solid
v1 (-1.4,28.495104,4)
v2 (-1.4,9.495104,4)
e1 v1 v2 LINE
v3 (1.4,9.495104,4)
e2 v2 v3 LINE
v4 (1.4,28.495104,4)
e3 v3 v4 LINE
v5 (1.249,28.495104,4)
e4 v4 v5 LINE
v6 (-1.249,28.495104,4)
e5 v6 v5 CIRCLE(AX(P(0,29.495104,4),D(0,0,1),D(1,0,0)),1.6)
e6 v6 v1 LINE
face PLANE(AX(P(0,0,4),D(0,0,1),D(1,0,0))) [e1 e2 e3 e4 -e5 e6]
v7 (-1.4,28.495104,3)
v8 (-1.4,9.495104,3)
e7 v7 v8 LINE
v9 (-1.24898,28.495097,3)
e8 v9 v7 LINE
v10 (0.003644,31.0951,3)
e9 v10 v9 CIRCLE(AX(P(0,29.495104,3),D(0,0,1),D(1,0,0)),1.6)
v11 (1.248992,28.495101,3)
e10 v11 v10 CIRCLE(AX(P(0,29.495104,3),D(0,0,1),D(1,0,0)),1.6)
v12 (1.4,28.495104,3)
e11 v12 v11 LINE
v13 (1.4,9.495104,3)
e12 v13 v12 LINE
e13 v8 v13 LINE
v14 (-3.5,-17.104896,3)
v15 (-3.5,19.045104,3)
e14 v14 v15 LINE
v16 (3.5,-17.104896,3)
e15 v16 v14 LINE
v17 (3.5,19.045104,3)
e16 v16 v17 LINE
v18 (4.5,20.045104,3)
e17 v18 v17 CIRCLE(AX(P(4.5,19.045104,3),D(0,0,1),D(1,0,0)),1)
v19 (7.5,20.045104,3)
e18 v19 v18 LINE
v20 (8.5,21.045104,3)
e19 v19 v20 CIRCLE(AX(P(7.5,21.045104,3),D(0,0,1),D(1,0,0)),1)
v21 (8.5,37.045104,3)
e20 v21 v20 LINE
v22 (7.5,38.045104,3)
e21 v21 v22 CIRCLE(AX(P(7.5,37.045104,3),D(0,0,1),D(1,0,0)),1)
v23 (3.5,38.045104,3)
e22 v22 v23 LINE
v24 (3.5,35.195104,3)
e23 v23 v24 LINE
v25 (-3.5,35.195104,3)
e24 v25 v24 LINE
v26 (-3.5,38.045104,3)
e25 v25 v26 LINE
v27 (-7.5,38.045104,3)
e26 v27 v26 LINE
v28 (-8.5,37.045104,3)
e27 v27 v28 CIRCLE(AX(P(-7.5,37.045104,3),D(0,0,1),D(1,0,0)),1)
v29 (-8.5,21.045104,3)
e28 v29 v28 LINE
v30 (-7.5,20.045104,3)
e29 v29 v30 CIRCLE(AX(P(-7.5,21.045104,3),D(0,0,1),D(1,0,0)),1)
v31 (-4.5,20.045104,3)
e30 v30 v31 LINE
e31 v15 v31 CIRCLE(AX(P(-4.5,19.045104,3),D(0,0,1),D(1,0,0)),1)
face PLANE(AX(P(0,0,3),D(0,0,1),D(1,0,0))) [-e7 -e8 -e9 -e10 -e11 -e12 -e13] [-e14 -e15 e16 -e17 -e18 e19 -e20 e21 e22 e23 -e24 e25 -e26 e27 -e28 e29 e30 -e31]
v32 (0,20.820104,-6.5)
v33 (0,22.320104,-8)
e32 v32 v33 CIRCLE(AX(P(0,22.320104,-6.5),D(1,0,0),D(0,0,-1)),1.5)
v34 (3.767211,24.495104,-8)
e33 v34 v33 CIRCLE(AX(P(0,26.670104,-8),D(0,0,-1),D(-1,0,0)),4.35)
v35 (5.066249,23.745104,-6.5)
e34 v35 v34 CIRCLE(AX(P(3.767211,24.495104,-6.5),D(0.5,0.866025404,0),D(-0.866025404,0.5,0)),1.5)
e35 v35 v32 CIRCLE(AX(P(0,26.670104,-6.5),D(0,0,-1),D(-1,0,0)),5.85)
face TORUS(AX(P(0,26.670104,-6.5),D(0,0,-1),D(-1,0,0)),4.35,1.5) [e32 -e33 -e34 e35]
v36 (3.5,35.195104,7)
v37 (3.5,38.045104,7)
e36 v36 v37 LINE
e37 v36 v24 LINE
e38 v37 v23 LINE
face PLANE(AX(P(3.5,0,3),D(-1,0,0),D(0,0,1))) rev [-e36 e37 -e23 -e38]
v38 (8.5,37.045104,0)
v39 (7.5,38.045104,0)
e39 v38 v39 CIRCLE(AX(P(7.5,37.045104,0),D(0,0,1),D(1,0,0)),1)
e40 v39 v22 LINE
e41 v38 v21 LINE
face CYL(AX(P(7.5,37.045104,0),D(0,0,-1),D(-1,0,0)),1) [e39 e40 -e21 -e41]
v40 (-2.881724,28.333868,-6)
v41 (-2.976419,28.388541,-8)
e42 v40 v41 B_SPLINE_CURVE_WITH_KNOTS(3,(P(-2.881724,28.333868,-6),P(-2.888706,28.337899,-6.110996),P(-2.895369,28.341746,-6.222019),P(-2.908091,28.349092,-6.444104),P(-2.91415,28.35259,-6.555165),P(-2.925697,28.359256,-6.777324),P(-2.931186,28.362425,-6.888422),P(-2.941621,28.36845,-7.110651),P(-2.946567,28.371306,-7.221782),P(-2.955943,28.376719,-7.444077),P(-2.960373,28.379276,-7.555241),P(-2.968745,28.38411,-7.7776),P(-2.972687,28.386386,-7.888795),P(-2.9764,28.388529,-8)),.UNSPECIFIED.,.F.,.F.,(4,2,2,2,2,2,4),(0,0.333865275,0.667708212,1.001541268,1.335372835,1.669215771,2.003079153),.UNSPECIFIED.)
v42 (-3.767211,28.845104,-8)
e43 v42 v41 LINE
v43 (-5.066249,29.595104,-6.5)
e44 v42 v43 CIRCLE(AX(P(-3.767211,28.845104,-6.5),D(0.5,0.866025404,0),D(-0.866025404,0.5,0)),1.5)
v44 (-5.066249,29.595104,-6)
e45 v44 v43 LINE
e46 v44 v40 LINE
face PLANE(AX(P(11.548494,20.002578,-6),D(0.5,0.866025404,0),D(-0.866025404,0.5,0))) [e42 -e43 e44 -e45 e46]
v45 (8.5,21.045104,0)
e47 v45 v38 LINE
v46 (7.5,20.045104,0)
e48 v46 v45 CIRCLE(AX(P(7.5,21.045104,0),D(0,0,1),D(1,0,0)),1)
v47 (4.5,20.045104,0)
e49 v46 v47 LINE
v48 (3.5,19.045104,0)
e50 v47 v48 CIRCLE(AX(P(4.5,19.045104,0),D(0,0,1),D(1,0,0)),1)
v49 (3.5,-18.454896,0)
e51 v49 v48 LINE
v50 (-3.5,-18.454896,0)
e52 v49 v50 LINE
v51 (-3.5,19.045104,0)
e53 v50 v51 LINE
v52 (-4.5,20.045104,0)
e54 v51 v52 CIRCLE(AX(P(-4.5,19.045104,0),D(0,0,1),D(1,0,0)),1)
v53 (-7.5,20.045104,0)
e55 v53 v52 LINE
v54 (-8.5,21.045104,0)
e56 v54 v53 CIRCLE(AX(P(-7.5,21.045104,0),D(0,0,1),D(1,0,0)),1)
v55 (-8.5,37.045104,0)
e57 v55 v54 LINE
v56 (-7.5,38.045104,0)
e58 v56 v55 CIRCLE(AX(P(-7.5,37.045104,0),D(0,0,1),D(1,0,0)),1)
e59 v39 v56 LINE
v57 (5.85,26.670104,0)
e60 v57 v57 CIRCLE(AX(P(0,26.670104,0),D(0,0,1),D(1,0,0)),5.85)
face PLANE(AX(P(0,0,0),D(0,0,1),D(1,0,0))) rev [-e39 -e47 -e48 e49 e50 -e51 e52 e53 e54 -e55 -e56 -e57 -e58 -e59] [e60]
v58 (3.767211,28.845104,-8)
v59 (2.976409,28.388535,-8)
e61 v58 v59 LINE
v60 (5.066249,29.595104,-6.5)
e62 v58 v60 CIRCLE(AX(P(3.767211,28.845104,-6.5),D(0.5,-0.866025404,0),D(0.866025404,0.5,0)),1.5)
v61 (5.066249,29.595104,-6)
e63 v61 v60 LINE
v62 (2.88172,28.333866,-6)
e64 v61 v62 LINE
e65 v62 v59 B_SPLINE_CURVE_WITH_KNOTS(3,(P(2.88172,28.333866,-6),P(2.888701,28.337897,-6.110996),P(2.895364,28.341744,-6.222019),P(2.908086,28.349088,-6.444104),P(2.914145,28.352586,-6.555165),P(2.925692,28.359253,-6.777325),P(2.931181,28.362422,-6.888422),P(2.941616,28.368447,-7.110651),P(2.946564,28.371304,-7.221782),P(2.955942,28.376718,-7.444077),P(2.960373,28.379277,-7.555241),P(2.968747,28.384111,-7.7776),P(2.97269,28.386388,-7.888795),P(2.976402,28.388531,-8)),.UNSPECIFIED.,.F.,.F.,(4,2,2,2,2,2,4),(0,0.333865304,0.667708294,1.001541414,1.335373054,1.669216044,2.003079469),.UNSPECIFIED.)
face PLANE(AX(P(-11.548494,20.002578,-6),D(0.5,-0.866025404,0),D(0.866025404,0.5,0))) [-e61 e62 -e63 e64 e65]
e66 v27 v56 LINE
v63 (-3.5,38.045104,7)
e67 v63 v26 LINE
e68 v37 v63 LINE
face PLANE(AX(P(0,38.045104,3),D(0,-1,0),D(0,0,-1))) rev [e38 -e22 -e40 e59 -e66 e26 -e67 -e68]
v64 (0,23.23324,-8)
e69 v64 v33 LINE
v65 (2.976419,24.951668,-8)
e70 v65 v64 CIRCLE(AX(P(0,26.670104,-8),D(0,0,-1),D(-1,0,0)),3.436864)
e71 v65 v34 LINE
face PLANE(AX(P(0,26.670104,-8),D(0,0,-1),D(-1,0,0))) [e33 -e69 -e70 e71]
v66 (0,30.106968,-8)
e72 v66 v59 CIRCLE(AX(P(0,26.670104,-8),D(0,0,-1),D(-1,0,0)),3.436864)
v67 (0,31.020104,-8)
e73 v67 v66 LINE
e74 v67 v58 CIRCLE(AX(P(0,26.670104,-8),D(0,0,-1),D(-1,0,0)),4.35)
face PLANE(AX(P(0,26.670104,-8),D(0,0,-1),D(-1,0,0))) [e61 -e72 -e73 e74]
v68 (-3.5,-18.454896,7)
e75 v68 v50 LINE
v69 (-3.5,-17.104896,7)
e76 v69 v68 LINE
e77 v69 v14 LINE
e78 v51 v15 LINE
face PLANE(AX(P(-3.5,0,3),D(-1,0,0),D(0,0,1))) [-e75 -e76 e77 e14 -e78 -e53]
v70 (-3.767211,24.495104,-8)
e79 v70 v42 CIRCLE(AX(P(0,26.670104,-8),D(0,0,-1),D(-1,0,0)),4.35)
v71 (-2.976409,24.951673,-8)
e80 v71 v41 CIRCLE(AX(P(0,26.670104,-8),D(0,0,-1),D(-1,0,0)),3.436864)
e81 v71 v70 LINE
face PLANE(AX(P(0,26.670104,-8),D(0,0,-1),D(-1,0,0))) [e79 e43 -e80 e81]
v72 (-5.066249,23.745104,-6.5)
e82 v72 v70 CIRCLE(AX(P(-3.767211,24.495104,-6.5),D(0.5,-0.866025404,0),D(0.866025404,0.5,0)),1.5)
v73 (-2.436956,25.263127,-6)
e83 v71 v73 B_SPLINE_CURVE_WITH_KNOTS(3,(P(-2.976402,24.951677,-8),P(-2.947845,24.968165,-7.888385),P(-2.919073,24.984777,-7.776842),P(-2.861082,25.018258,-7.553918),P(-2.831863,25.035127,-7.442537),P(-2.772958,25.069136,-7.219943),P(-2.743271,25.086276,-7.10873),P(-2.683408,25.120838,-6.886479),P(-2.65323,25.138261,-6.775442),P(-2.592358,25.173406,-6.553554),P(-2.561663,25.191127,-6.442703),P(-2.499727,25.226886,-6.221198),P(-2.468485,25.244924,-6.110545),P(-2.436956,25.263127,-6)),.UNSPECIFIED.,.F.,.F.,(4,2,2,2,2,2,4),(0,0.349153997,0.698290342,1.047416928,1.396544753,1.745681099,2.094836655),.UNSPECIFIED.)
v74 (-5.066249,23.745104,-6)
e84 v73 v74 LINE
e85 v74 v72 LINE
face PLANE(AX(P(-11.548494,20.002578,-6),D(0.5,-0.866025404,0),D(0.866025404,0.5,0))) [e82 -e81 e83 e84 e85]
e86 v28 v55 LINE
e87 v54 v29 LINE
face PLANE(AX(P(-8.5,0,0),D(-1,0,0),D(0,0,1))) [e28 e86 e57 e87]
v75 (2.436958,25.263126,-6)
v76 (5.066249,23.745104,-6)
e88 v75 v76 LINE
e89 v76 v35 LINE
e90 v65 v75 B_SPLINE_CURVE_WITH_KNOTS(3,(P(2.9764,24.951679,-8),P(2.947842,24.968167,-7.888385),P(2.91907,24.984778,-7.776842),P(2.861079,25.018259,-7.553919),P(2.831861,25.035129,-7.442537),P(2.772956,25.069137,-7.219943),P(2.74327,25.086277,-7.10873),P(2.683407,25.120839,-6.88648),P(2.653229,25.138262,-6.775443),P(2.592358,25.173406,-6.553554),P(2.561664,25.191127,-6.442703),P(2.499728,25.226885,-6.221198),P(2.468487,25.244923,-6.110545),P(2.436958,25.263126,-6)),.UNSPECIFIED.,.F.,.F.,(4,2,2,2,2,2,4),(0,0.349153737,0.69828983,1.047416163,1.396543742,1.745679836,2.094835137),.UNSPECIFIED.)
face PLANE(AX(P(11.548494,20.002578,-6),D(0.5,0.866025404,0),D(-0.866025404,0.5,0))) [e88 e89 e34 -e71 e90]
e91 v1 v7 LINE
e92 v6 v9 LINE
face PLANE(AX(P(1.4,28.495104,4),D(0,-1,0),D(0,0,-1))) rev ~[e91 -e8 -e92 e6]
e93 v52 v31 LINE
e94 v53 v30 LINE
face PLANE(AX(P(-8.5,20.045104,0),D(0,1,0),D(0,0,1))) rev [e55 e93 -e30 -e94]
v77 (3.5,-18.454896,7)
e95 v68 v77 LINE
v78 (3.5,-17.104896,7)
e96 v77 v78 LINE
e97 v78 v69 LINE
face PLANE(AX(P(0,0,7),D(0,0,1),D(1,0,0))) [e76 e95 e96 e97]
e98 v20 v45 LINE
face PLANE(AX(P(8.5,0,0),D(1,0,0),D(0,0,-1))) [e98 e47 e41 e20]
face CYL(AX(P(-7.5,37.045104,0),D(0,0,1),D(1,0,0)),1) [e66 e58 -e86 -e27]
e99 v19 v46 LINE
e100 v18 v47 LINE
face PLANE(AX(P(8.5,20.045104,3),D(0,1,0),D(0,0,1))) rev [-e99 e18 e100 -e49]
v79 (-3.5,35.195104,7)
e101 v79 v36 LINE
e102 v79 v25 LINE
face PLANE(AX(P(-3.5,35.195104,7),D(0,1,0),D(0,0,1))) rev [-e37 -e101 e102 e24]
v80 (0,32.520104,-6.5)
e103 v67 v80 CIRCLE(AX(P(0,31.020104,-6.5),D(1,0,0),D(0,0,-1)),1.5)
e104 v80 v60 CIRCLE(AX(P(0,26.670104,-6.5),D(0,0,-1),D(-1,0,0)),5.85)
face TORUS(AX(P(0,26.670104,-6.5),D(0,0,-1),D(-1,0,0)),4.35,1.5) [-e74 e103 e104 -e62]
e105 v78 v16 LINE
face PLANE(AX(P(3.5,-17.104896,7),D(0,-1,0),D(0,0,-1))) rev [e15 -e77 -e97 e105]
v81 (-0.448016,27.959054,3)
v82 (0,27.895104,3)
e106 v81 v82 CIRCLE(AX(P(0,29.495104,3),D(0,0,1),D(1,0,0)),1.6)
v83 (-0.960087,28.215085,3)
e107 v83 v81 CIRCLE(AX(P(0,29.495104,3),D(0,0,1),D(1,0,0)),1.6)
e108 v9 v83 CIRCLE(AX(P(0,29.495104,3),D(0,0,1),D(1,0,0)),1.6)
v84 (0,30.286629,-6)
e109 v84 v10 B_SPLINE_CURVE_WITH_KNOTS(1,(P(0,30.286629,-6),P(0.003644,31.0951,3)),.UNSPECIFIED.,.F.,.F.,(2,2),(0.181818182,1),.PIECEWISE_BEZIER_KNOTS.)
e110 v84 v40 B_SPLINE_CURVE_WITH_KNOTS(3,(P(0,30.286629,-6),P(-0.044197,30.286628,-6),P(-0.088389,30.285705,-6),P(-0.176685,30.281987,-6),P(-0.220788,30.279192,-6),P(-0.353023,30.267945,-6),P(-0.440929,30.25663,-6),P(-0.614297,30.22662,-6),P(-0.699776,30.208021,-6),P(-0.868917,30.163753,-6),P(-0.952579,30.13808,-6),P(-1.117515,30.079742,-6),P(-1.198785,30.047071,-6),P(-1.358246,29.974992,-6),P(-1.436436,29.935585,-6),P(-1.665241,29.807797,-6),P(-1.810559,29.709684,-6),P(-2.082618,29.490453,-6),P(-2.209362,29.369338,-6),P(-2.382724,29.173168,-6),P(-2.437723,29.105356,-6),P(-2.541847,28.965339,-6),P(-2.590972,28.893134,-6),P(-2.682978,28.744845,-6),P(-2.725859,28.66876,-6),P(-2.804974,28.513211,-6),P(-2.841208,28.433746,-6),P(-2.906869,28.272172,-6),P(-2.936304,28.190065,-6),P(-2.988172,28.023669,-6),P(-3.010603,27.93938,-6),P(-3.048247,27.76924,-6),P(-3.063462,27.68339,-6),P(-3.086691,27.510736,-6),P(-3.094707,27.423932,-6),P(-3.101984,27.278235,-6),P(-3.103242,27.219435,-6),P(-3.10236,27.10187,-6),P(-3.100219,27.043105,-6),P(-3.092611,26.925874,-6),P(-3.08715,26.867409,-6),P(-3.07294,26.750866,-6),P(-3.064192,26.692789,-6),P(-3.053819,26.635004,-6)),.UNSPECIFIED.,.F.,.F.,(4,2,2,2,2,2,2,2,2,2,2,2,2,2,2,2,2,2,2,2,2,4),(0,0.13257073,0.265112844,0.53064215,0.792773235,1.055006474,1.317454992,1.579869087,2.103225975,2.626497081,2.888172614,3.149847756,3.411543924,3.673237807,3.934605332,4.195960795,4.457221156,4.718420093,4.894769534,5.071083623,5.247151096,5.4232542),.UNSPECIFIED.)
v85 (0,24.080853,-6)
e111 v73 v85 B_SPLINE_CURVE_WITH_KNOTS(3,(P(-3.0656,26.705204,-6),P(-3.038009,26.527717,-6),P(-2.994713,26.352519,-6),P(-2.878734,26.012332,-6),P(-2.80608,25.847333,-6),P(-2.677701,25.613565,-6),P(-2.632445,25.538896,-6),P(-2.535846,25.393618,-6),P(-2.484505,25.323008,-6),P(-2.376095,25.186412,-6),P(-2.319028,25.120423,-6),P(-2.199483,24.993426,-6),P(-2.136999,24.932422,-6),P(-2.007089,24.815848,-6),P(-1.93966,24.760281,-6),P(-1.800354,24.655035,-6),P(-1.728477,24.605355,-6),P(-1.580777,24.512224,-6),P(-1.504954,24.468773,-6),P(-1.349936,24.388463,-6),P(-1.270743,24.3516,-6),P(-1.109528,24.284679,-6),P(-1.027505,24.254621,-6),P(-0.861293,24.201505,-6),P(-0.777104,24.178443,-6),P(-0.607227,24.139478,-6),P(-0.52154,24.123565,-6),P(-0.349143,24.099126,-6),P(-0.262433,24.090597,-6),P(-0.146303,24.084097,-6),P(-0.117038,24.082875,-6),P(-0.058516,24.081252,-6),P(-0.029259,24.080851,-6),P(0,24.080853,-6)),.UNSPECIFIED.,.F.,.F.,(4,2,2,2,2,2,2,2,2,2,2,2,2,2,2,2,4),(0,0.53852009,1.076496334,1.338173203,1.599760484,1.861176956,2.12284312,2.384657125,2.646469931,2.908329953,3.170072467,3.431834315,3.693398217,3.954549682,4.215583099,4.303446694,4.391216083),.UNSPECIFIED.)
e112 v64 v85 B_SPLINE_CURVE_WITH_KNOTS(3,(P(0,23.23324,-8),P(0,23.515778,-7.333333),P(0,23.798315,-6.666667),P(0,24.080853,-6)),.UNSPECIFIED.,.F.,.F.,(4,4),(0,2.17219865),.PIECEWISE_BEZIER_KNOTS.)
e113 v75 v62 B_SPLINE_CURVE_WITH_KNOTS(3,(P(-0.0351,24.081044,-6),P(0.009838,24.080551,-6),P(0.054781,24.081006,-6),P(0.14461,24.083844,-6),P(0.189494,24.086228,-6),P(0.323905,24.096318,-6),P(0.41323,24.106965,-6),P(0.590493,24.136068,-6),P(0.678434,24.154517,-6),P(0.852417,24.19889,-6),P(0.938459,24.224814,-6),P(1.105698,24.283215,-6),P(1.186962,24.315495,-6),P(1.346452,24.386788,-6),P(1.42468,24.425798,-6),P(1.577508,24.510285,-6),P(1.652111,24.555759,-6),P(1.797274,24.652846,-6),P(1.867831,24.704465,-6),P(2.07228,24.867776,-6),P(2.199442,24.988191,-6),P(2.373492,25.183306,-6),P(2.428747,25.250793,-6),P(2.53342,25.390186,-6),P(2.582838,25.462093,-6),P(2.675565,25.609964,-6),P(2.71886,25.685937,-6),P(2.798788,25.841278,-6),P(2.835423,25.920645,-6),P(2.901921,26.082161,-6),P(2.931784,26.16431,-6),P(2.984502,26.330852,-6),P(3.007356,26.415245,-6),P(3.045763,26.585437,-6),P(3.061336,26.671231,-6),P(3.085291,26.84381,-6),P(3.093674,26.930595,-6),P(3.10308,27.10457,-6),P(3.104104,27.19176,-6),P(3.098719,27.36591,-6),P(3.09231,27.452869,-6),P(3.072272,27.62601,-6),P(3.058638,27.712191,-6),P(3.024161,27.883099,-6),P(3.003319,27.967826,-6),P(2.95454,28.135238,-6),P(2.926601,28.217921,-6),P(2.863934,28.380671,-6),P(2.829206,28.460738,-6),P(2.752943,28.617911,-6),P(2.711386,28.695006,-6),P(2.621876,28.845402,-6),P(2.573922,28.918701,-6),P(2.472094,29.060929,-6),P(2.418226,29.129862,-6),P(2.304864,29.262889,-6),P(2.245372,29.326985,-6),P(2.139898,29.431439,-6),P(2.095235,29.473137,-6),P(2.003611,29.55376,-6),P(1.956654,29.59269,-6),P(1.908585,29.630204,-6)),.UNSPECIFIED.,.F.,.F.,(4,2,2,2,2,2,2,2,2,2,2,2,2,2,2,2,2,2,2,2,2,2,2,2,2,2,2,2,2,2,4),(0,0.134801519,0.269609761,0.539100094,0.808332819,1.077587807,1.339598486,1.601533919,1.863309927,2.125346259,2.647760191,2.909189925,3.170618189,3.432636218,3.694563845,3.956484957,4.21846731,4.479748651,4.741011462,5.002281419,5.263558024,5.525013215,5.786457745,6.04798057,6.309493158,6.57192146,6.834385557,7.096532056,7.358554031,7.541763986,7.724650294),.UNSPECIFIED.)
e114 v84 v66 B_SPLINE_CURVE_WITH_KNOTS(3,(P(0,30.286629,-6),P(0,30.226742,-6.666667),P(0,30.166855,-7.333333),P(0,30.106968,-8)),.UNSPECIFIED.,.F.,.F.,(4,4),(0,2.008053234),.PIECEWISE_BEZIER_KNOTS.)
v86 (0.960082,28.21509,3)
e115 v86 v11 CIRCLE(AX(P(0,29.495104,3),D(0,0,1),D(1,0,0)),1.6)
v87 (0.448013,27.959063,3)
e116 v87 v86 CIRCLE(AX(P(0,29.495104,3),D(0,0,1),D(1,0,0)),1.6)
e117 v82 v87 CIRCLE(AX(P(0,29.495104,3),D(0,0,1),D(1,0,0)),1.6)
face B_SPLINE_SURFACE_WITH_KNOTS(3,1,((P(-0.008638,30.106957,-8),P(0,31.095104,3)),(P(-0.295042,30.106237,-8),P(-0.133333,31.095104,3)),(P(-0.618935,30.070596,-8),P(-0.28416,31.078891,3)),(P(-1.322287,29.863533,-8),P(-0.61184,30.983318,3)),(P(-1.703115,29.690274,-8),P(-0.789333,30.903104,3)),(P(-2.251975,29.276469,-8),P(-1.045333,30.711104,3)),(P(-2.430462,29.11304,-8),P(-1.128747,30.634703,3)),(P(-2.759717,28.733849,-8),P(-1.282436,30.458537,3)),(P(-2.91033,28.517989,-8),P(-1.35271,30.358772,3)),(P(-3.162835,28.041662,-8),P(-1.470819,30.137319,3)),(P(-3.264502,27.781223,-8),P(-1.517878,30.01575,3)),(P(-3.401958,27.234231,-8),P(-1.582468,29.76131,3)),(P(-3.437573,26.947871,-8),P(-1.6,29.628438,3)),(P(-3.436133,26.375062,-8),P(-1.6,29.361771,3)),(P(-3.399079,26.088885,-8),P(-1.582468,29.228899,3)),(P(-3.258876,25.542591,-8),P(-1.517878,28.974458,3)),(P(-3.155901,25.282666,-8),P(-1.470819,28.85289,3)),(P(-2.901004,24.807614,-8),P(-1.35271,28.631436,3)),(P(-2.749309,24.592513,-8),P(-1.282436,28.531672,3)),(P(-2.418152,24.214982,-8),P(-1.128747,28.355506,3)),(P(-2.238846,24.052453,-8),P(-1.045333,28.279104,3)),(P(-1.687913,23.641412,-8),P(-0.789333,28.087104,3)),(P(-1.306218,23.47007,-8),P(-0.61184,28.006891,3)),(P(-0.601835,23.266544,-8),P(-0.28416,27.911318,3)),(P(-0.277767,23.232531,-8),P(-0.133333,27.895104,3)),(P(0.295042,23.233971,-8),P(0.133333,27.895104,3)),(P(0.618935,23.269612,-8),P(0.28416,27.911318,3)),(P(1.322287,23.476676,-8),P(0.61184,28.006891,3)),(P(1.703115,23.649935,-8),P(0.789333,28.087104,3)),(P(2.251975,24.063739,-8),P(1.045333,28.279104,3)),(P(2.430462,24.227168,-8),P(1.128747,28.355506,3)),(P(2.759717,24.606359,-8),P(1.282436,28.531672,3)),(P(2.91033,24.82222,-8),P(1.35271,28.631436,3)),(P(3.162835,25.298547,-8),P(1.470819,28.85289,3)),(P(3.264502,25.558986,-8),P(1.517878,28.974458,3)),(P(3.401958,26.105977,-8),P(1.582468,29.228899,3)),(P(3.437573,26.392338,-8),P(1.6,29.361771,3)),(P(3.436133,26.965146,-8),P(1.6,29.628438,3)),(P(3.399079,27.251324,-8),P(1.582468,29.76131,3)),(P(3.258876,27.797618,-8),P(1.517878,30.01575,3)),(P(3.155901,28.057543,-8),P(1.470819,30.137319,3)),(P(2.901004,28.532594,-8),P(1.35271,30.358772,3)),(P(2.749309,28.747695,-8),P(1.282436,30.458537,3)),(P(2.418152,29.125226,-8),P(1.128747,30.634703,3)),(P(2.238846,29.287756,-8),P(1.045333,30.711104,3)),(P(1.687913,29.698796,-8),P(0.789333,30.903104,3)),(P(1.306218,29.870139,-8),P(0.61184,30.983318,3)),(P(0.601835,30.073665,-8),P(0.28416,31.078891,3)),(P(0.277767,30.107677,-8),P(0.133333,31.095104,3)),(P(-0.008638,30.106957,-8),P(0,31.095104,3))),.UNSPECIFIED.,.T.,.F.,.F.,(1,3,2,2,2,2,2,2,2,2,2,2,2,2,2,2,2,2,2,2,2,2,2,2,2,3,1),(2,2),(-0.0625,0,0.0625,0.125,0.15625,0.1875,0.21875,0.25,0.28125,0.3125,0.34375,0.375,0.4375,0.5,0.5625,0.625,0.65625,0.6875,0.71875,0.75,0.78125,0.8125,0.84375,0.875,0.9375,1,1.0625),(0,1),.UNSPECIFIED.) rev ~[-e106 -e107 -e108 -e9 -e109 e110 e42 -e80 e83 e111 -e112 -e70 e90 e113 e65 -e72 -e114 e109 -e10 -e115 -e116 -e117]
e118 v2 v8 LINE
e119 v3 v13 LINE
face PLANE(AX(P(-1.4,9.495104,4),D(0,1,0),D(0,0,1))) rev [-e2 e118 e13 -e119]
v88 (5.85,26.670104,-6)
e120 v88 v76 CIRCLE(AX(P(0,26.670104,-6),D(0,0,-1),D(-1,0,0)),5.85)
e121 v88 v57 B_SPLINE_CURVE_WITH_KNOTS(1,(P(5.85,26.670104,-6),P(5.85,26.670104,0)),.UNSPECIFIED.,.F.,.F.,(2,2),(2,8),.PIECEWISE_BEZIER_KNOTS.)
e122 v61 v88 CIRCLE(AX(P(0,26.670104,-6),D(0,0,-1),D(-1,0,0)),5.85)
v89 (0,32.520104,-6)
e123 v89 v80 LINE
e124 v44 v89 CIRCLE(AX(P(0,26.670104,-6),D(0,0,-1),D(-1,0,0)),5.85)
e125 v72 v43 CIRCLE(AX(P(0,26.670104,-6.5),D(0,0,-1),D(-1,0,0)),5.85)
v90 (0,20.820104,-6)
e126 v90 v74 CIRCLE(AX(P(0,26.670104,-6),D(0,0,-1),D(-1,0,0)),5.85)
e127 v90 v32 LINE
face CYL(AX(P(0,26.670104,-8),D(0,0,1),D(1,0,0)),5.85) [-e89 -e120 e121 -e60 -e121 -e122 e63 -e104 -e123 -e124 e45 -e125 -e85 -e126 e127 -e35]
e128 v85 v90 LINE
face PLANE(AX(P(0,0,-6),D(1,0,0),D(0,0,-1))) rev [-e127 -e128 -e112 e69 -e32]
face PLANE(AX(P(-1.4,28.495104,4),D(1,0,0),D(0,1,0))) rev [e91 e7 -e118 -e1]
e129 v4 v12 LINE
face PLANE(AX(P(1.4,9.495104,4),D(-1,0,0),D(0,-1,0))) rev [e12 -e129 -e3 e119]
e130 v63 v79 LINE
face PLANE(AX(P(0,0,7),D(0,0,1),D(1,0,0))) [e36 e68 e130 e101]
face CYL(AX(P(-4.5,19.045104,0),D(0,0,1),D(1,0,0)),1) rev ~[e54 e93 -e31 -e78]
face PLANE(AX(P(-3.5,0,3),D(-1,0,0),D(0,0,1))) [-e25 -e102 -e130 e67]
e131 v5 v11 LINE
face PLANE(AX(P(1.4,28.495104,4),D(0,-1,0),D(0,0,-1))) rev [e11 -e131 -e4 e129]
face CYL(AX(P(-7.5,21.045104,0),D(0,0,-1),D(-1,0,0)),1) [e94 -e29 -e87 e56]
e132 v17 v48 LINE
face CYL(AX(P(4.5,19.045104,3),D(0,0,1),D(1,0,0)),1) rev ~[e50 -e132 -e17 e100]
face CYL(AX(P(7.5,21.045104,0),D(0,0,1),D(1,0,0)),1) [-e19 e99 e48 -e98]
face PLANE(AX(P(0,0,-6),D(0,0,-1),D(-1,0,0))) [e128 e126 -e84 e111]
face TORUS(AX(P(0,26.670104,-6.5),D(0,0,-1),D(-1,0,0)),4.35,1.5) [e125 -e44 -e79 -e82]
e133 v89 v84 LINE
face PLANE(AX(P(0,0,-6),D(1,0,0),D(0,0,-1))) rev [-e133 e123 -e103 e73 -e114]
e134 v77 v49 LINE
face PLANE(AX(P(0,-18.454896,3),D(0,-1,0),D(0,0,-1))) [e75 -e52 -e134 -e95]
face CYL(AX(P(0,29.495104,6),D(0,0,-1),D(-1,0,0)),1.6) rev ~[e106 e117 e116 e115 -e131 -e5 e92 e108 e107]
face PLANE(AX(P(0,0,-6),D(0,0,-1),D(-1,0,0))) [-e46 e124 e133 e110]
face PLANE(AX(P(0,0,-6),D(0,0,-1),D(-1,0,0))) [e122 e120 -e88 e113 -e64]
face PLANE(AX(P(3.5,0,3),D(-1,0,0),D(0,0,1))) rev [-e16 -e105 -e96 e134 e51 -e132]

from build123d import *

# Parameters (mm, degrees)
SKETCH1_W           = 7
SKETCH1_H           = 56.5
BOSS_EXTRUDE1_DEPTH = 3
SKETCH2_W           = 2.8
SKETCH2_H           = 19
BOSS_EXTRUDE2_DEPTH = 1
SKETCH3_W           = 7
SKETCH3_H           = 2.85
SKETCH3_H_2         = 1.35
BOSS_EXTRUDE3_DEPTH = 4
SKETCH4_W           = 3
SKETCH4_H           = 18
BOSS_EXTRUDE4_DEPTH = 5
SKETCH5_W           = 3
SKETCH5_H           = 18
BOSS_EXTRUDE5_DEPTH = 5
SKETCH9_R           = 5.85
BOSS_EXTRUDE7_DEPTH = 8
FILLET1_R           = 1.5
FILLET2_R           = 1
SKETCH11_R          = 3.436863838
SKETCH7_R           = 1.6
CUT_EXTRUDE5_START  = -2
CUT_EXTRUDE5_DEPTH  = 2
SKETCH14_R          = 1.6
CUT_EXTRUDE6_DEPTH  = 3


with BuildPart() as part:
    # Sketch1 → Boss-Extrude1 (new body)
    with BuildSketch(Plane.XY):
        with Locations((0, 9.795104227)):
            Rectangle(SKETCH1_W, SKETCH1_H)
    extrude(amount=BOSS_EXTRUDE1_DEPTH)

    # Sketch2 → Boss-Extrude2 (add)
    with BuildSketch(Plane.XY.offset(3)):
        with Locations((0, 18.995104227)):
            Rectangle(SKETCH2_W, SKETCH2_H)
    extrude(amount=BOSS_EXTRUDE2_DEPTH)

    # Sketch3 → Boss-Extrude3 (add)
    with BuildSketch(Plane.XY.offset(3)):
        with Locations((0, 36.620104227)):
            Rectangle(SKETCH3_W, SKETCH3_H)
        with Locations((0, -17.779895773)):
            Rectangle(SKETCH3_W, SKETCH3_H_2)
    extrude(amount=BOSS_EXTRUDE3_DEPTH)

    # Sketch4 → Boss-Extrude4 (add)
    with BuildSketch(Plane.ZY.offset(3.5)):
        with Locations((1.5, 29.045104227)):
            Rectangle(SKETCH4_W, SKETCH4_H)
    extrude(amount=BOSS_EXTRUDE4_DEPTH)

    # Sketch5 → Boss-Extrude5 (add)
    with BuildSketch(Plane(origin=(3.5, 0, 0), x_dir=(0, 0, -1), z_dir=(1, 0, 0))):
        with Locations((-1.5, 29.045104227)):
            Rectangle(SKETCH5_W, SKETCH5_H)
    extrude(amount=BOSS_EXTRUDE5_DEPTH)

    # Sketch9 → Boss-Extrude7 (add)
    with BuildSketch(Plane(origin=(0, 0, 0), x_dir=(-1, 0, 0), z_dir=(0, 0, -1))):
        with Locations(Location((0, 26.670104227, 0), (0, 0, 180))):
            Circle(SKETCH9_R)
    extrude(amount=BOSS_EXTRUDE7_DEPTH)

    # Fillet1
    fillet1_edges = [part.edges().sort_by_distance(p)[0] for p in [
        (-5.85, 26.670104227, -8),
    ]]
    fillet(fillet1_edges, radius=FILLET1_R)

    # Fillet2
    fillet2_edges = [part.edges().sort_by_distance(p)[0] for p in [
        (-3.5, 20.045104227, 1.5),
        (-8.5, 20.045104227, 1.5),
        (-8.5, 38.045104227, 1.5),
        (3.5, 20.045104227, 1.5),
        (8.5, 38.045104227, 1.5),
        (8.5, 20.045104227, 1.5),
    ]]
    fillet(fillet2_edges, radius=FILLET2_R)

    # Sketch11 → Cut-Loft6 section 0
    with BuildSketch(Plane(origin=(0, 0, -8), x_dir=(-1, 0, 0), z_dir=(0, 0, -1))):
        with Locations((0, 26.670104227)):
            Circle(SKETCH11_R)
    # Sketch7 → Cut-Loft6 section 1
    with BuildSketch(Plane.XY.offset(3)):
        with Locations((0, 29.495104227)):
            Circle(SKETCH7_R)
    loft(mode=Mode.SUBTRACT)

    # Cut-Extrude5: read off the stored shape, not the designer's step
    # Cut-Extrude5 outline → Cut-Extrude5 (cut)
    with BuildSketch(Plane(origin=(0, 0, -8), x_dir=(-1, 0, 0), z_dir=(0, 0, -1)).offset(CUT_EXTRUDE5_START)):
        with BuildLine():
            ThreePointArc((5.066248612, 29.595104227), (2.925, 31.736352839), (0, 32.520104227))
            Line((0, 32.520104227), (0, 26.670104227))
            Line((0, 26.670104227), (5.066248612, 29.595104227))
        make_face()
        with BuildLine():
            Line((0, 26.670104227), (-5.066248612, 29.595104227))
            ThreePointArc((-5.066248612, 29.595104227), (-5.85, 26.670104227), (-5.066248612, 23.745104227))
            Line((-5.066248612, 23.745104227), (0, 26.670104227))
        make_face()
        with BuildLine():
            Line((5.066248612, 23.745104227), (0, 26.670104227))
            Line((0, 26.670104227), (0, 20.820104227))
            ThreePointArc((0, 20.820104227), (2.925, 21.603855615), (5.066248612, 23.745104227))
        make_face()
    extrude(amount=CUT_EXTRUDE5_DEPTH, mode=Mode.SUBTRACT)

    # Sketch14 → Cut-Extrude6 (cut)
    with BuildSketch(Plane.XY.offset(3)):
        with Locations((0, 29.495104227)):
            Circle(SKETCH14_R)
    extrude(amount=CUT_EXTRUDE6_DEPTH, mode=Mode.SUBTRACT)


solid = part.part
